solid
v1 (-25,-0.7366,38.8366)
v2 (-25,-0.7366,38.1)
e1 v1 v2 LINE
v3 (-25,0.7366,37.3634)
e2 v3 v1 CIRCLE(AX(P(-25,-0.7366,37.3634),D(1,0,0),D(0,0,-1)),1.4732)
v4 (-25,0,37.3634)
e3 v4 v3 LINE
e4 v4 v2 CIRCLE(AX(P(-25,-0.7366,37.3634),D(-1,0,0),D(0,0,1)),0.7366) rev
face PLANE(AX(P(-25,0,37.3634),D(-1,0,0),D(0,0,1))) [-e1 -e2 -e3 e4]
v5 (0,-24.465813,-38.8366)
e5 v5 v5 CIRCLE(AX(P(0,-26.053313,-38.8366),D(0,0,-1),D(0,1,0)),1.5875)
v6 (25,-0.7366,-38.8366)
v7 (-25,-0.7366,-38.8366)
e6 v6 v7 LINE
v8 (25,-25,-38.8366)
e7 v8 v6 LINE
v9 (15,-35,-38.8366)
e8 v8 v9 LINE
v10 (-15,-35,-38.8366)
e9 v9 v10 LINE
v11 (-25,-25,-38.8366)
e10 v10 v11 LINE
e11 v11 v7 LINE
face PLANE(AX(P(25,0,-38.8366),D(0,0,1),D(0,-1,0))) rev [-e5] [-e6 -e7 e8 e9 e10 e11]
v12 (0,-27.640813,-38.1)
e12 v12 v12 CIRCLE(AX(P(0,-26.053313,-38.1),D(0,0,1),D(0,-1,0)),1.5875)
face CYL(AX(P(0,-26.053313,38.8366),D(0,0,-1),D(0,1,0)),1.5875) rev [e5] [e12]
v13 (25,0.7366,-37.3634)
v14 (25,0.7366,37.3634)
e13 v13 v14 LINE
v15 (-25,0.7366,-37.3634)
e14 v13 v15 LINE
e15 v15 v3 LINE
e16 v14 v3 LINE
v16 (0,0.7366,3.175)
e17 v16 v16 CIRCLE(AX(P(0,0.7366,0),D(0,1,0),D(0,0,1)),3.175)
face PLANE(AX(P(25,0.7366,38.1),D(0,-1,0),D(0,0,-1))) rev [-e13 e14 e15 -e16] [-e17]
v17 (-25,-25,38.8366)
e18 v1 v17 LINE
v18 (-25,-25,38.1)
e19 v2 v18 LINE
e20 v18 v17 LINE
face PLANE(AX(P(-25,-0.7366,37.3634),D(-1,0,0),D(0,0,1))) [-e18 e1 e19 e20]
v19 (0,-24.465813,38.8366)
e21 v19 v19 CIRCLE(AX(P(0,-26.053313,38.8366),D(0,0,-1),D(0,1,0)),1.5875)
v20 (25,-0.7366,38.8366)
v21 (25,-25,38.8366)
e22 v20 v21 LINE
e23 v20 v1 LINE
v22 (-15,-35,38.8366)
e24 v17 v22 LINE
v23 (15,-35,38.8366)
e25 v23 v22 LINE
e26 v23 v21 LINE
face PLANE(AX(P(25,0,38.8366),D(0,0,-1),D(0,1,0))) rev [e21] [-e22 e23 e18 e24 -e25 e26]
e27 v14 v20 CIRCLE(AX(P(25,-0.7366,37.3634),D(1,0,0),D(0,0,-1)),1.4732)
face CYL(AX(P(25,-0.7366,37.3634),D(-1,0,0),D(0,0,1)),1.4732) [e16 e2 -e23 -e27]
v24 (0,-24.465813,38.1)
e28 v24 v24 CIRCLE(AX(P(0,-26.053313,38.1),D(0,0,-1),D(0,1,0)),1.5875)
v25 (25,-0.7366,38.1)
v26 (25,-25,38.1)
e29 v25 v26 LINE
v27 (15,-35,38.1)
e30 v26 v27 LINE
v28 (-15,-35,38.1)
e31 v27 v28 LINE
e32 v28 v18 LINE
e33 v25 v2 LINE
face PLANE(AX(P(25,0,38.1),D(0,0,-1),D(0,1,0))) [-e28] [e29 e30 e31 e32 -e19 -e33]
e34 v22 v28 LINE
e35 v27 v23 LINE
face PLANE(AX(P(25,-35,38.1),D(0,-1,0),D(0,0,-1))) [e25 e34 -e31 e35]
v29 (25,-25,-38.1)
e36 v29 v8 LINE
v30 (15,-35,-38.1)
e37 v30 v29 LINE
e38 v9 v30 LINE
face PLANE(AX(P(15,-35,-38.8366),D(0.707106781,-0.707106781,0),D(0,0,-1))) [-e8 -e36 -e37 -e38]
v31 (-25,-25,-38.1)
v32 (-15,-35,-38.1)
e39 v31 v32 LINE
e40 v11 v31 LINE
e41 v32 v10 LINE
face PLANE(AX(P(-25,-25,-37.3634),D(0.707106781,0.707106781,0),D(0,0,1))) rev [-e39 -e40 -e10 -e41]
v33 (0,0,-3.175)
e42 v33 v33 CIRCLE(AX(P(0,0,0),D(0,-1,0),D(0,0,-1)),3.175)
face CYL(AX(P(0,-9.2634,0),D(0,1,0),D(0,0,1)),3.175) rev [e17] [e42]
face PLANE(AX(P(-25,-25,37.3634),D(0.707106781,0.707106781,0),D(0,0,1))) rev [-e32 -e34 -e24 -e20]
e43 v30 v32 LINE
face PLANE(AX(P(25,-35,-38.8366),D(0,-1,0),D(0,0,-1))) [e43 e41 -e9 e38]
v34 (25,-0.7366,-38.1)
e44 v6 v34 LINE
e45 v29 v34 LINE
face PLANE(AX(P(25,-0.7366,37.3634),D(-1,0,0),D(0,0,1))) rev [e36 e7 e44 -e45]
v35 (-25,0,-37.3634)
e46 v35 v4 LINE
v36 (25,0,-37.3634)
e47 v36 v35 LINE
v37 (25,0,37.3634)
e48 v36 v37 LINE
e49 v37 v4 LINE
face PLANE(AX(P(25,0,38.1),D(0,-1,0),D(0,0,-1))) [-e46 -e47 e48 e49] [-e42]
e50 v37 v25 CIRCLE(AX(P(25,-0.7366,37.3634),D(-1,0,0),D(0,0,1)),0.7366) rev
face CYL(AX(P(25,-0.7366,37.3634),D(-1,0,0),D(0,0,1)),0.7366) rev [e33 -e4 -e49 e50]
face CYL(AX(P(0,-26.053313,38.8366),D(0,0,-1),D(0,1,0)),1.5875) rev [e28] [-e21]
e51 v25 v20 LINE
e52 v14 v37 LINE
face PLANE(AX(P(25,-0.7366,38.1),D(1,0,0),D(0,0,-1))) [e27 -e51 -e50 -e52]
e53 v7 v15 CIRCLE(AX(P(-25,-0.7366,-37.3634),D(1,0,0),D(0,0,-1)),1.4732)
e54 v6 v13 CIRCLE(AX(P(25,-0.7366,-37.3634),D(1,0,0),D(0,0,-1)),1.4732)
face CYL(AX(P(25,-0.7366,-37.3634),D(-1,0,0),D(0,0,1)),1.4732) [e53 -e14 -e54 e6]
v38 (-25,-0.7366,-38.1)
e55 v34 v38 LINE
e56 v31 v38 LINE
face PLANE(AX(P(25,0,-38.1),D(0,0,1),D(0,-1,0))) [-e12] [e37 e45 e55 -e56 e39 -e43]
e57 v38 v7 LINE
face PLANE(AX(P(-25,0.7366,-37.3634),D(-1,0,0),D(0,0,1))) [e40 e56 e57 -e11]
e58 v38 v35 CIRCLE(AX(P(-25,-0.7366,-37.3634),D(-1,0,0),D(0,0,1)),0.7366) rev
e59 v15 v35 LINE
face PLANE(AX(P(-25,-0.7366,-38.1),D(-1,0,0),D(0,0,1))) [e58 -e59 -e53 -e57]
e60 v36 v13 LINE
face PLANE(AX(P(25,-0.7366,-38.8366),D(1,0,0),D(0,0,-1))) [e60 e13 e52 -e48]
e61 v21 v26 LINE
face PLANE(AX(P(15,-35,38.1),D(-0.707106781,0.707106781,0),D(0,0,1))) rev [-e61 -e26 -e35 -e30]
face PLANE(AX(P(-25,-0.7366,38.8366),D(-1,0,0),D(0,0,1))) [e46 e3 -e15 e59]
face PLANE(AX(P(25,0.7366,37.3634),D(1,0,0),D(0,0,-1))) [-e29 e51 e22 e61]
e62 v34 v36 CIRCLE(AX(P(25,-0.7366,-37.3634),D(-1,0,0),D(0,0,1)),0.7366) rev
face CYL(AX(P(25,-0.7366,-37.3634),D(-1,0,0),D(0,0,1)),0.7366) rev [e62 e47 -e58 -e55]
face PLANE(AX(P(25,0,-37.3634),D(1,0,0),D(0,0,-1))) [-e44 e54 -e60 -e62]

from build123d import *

# Parameters (mm, degrees)
BASE_FLANGE1_DEPTH      = 25
BASE_FLANGE1_DEPTH_BACK = 25
SKETCH6_R               = 1.5875
CUT_EXTRUDE1_DEPTH      = 89.786969755
SKETCH7_R               = 3.175
CUT_EXTRUDE2_DEPTH      = 10
CHAMFER1_SIZE           = 10


# Sheet-metal steps are written as plain solids
with BuildPart() as part:
    # Sketch1 → Base-Flange1 (new, two sides: drawn at the far end of the back side and taken through both)
    with BuildSketch(Plane(origin=(0, 0, 0), x_dir=(0, 0, -1), z_dir=(1, 0, 0)).offset(-BASE_FLANGE1_DEPTH_BACK)):
        with BuildLine():
            Line((-38.1, -35), (-38.1, -0.7366))
            ThreePointArc((-38.1, -0.7366), (-37.884254855, -0.215745145), (-37.3634, 0))
            Line((-37.3634, 0), (37.3634, 0))
            ThreePointArc((37.3634, 0), (37.884254855, -0.215745145), (38.1, -0.7366))
            Line((38.1, -0.7366), (38.1, -35))
            Line((38.1, -35), (38.8366, -35))
            Line((38.8366, -35), (38.8366, -0.7366))
            ThreePointArc((38.8366, -0.7366), (38.40510971, 0.30510971), (37.3634, 0.7366))
            Line((37.3634, 0.7366), (-37.3634, 0.7366))
            ThreePointArc((-37.3634, 0.7366), (-38.40510971, 0.30510971), (-38.8366, -0.7366))
            Line((-38.8366, -0.7366), (-38.8366, -35))
            Line((-38.8366, -35), (-38.1, -35))
        make_face()
    extrude(amount=BASE_FLANGE1_DEPTH + BASE_FLANGE1_DEPTH_BACK)

    # Sketch6 → Cut-Extrude1 (cut, through all)
    with BuildSketch(Plane(origin=(0, 0, -38.8366), x_dir=(-1, 0, 0), z_dir=(0, 0, -1))):
        with Locations(Location((0, -26.05331339, 0), (0, 0, 90))):
            Circle(SKETCH6_R)
    extrude(amount=-CUT_EXTRUDE1_DEPTH, mode=Mode.SUBTRACT)

    # Sketch7 → Cut-Extrude2 (cut)
    with BuildSketch(Plane(origin=(0, 0.7366, 0), x_dir=(1, 0, 0), z_dir=(0, 1, 0))):
        with Locations(Location((0, 0, 0), (0, 0, 270))):
            Circle(SKETCH7_R)
    extrude(amount=-CUT_EXTRUDE2_DEPTH, mode=Mode.SUBTRACT)

    # Chamfer1
    chamfer1_edges = [part.edges().sort_by_distance(p)[0] for p in [
        (25, -35, -38.4683),
        (-25, -35, -38.4683),
        (-25, -35, 38.4683),
        (25, -35, 38.4683),
    ]]
    chamfer(chamfer1_edges, length=CHAMFER1_SIZE)


solid = part.part
